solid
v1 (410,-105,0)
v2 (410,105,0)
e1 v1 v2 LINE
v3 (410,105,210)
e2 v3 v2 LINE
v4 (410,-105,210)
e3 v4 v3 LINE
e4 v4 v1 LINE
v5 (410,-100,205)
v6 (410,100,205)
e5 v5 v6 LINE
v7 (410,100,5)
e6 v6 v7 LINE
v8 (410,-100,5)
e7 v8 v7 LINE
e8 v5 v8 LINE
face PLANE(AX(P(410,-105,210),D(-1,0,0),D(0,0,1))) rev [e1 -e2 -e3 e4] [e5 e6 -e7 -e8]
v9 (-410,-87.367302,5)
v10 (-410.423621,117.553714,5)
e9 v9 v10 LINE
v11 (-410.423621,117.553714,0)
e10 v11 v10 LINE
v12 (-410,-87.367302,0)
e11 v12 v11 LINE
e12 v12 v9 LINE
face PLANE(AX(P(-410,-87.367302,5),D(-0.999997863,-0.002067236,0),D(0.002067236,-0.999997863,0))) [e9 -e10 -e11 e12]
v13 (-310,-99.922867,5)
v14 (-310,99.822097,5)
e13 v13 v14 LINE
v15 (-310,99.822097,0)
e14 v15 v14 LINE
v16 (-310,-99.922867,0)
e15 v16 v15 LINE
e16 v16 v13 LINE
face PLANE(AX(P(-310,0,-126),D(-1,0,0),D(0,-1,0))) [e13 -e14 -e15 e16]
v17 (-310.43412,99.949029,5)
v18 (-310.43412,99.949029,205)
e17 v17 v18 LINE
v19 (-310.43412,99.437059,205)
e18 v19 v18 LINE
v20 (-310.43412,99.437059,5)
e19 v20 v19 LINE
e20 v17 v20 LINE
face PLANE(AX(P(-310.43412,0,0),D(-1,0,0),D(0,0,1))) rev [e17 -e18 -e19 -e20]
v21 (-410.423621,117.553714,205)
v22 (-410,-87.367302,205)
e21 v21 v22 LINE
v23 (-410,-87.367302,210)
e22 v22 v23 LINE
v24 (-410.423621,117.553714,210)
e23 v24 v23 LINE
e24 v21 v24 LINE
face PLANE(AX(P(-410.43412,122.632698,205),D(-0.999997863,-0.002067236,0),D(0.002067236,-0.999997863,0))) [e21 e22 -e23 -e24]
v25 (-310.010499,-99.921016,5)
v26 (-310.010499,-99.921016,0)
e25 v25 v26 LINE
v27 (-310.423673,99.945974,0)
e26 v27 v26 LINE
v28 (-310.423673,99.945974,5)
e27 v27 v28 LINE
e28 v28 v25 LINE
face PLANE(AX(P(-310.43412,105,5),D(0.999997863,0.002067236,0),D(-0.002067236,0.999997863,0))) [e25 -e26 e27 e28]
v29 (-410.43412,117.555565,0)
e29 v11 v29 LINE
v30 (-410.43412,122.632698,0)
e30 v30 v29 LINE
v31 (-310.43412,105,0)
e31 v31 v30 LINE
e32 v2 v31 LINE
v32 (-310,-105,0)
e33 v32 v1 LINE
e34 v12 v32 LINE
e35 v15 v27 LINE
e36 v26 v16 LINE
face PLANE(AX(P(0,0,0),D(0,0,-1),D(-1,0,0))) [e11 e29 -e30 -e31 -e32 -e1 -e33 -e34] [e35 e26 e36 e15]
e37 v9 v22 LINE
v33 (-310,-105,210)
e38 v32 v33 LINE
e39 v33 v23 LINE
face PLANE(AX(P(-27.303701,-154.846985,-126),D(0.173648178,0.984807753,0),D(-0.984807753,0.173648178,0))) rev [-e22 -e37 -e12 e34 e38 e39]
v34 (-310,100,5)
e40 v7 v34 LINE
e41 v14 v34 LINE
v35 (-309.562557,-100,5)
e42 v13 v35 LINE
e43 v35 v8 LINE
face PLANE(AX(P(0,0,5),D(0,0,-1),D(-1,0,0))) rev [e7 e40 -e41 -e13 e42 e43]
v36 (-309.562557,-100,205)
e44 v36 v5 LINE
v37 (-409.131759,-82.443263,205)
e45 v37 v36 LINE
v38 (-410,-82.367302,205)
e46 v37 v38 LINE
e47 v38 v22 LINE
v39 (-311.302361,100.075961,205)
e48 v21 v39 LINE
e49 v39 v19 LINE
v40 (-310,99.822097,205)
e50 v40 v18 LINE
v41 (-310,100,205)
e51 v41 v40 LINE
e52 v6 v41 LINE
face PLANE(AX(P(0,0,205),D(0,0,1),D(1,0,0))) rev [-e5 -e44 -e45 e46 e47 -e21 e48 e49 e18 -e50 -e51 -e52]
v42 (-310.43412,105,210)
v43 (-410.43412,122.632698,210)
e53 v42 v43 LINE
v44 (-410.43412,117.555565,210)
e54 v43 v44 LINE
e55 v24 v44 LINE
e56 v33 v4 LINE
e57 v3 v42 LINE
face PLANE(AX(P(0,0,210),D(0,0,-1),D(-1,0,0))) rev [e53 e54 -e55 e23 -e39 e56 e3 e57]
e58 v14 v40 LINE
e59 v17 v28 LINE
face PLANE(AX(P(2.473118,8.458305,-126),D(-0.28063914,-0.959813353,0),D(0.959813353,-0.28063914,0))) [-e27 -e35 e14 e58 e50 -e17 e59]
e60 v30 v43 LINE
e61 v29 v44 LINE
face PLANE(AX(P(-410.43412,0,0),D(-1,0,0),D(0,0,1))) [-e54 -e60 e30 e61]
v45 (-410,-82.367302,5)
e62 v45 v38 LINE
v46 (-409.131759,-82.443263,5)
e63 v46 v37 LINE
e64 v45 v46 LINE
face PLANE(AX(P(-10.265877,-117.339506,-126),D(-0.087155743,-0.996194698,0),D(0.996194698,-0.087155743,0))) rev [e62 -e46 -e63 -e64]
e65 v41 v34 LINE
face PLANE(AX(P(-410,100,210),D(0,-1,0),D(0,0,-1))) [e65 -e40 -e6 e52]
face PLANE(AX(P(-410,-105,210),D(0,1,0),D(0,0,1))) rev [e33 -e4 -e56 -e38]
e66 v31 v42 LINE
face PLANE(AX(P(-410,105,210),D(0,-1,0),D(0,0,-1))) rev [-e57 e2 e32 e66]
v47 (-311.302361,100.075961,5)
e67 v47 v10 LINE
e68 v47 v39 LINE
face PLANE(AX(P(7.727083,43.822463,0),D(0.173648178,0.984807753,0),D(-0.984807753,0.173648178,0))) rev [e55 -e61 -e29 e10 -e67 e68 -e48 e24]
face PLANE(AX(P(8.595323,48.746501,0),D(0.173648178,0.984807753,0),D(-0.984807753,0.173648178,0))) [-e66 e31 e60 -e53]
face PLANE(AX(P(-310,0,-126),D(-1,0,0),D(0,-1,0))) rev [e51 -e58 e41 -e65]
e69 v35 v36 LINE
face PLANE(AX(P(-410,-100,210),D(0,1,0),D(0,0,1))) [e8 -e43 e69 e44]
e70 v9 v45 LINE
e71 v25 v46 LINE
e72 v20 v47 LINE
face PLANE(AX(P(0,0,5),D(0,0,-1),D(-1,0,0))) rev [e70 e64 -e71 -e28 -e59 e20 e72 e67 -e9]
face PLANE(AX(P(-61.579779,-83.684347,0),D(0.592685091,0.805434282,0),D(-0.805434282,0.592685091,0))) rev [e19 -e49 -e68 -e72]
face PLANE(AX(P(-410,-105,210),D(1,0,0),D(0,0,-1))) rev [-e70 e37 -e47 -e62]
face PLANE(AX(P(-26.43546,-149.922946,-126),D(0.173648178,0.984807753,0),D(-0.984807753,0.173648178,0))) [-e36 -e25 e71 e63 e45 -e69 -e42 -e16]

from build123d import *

# Parameters (mm, degrees)
SKETCH1_W           = 820
SKETCH1_H           = 210
BOSS_EXTRUDE1_DEPTH = 210
CUT_EXTRUDE5_DEPTH  = 336
BOSS_EXTRUDE2_DEPTH = 210
BOSS_EXTRUDE3_DEPTH = 5
BOSS_EXTRUDE4_DEPTH = 5
SHELL2_START        = 5
SHELL2_DEPTH        = 200


# Read off the part's stored shape, not the designer's step: Shell2
with BuildPart() as part:
    # Sketch1 → Boss-Extrude1 (new body)
    with BuildSketch(Plane.XY):
        Rectangle(SKETCH1_W, SKETCH1_H)
    extrude(amount=BOSS_EXTRUDE1_DEPTH)

    # Sketch2 → Cut-Extrude5 (cut)
    with BuildSketch(Plane.XY.offset(210)):
        Polygon((-409.131759112, -82.443263164), (-310, -99.922866941), (-310, 99.822096903), (-310.868240888, 100.075961235), (-338.793852416, 105), (-410, 105), (-410, -82.367301929), align=None)
        Polygon((-410, -105), (-310, -105), (-410, -87.367301929), align=None)
    extrude(amount=-CUT_EXTRUDE5_DEPTH, mode=Mode.SUBTRACT)

    # Sketch6 → Boss-Extrude2 (add, through all)
    with BuildSketch(Plane.XY.offset(210)):
        Polygon((-338.793852416, 105), (-310.434120444, 105), (-410.434120444, 122.632698071), (-410.434120444, 117.555565011), (-311.302361333, 100.075961235), (-310.434120444, 99.437059413), (-310.434120444, 99.949029069), (-310.868240888, 100.075961235), align=None)
    extrude(amount=-BOSS_EXTRUDE2_DEPTH)

    # Sketch8 → Boss-Extrude3 (add)
    with BuildSketch(Plane.XY.offset(210)):
        Polygon((-410, -87.367301929), (-310, -105), (410, -105), (410, 105), (-310.434120444, 105), (-410.434120444, 122.632698071), align=None)
    extrude(amount=-BOSS_EXTRUDE3_DEPTH)

    # Sketch9 → Boss-Extrude4 (add)
    with BuildSketch(Plane(origin=(0, 0, 0), x_dir=(-1, 0, 0), z_dir=(0, 0, -1))):
        Polygon((310.434120444, 105), (310, -105), (410, -87.367301929), (410.434120444, 122.632698071), align=None)
    extrude(amount=-BOSS_EXTRUDE4_DEPTH)

    # Shell2 outline → Shell2 (cut)
    with BuildSketch(Plane.XY.offset(SHELL2_START)):
        Polygon((410, 100), (-310, 100), (-310, -99.922866941), (-309.562556682, -100), (410, -100), align=None)
    extrude(amount=SHELL2_DEPTH, mode=Mode.SUBTRACT)


solid = part.part
